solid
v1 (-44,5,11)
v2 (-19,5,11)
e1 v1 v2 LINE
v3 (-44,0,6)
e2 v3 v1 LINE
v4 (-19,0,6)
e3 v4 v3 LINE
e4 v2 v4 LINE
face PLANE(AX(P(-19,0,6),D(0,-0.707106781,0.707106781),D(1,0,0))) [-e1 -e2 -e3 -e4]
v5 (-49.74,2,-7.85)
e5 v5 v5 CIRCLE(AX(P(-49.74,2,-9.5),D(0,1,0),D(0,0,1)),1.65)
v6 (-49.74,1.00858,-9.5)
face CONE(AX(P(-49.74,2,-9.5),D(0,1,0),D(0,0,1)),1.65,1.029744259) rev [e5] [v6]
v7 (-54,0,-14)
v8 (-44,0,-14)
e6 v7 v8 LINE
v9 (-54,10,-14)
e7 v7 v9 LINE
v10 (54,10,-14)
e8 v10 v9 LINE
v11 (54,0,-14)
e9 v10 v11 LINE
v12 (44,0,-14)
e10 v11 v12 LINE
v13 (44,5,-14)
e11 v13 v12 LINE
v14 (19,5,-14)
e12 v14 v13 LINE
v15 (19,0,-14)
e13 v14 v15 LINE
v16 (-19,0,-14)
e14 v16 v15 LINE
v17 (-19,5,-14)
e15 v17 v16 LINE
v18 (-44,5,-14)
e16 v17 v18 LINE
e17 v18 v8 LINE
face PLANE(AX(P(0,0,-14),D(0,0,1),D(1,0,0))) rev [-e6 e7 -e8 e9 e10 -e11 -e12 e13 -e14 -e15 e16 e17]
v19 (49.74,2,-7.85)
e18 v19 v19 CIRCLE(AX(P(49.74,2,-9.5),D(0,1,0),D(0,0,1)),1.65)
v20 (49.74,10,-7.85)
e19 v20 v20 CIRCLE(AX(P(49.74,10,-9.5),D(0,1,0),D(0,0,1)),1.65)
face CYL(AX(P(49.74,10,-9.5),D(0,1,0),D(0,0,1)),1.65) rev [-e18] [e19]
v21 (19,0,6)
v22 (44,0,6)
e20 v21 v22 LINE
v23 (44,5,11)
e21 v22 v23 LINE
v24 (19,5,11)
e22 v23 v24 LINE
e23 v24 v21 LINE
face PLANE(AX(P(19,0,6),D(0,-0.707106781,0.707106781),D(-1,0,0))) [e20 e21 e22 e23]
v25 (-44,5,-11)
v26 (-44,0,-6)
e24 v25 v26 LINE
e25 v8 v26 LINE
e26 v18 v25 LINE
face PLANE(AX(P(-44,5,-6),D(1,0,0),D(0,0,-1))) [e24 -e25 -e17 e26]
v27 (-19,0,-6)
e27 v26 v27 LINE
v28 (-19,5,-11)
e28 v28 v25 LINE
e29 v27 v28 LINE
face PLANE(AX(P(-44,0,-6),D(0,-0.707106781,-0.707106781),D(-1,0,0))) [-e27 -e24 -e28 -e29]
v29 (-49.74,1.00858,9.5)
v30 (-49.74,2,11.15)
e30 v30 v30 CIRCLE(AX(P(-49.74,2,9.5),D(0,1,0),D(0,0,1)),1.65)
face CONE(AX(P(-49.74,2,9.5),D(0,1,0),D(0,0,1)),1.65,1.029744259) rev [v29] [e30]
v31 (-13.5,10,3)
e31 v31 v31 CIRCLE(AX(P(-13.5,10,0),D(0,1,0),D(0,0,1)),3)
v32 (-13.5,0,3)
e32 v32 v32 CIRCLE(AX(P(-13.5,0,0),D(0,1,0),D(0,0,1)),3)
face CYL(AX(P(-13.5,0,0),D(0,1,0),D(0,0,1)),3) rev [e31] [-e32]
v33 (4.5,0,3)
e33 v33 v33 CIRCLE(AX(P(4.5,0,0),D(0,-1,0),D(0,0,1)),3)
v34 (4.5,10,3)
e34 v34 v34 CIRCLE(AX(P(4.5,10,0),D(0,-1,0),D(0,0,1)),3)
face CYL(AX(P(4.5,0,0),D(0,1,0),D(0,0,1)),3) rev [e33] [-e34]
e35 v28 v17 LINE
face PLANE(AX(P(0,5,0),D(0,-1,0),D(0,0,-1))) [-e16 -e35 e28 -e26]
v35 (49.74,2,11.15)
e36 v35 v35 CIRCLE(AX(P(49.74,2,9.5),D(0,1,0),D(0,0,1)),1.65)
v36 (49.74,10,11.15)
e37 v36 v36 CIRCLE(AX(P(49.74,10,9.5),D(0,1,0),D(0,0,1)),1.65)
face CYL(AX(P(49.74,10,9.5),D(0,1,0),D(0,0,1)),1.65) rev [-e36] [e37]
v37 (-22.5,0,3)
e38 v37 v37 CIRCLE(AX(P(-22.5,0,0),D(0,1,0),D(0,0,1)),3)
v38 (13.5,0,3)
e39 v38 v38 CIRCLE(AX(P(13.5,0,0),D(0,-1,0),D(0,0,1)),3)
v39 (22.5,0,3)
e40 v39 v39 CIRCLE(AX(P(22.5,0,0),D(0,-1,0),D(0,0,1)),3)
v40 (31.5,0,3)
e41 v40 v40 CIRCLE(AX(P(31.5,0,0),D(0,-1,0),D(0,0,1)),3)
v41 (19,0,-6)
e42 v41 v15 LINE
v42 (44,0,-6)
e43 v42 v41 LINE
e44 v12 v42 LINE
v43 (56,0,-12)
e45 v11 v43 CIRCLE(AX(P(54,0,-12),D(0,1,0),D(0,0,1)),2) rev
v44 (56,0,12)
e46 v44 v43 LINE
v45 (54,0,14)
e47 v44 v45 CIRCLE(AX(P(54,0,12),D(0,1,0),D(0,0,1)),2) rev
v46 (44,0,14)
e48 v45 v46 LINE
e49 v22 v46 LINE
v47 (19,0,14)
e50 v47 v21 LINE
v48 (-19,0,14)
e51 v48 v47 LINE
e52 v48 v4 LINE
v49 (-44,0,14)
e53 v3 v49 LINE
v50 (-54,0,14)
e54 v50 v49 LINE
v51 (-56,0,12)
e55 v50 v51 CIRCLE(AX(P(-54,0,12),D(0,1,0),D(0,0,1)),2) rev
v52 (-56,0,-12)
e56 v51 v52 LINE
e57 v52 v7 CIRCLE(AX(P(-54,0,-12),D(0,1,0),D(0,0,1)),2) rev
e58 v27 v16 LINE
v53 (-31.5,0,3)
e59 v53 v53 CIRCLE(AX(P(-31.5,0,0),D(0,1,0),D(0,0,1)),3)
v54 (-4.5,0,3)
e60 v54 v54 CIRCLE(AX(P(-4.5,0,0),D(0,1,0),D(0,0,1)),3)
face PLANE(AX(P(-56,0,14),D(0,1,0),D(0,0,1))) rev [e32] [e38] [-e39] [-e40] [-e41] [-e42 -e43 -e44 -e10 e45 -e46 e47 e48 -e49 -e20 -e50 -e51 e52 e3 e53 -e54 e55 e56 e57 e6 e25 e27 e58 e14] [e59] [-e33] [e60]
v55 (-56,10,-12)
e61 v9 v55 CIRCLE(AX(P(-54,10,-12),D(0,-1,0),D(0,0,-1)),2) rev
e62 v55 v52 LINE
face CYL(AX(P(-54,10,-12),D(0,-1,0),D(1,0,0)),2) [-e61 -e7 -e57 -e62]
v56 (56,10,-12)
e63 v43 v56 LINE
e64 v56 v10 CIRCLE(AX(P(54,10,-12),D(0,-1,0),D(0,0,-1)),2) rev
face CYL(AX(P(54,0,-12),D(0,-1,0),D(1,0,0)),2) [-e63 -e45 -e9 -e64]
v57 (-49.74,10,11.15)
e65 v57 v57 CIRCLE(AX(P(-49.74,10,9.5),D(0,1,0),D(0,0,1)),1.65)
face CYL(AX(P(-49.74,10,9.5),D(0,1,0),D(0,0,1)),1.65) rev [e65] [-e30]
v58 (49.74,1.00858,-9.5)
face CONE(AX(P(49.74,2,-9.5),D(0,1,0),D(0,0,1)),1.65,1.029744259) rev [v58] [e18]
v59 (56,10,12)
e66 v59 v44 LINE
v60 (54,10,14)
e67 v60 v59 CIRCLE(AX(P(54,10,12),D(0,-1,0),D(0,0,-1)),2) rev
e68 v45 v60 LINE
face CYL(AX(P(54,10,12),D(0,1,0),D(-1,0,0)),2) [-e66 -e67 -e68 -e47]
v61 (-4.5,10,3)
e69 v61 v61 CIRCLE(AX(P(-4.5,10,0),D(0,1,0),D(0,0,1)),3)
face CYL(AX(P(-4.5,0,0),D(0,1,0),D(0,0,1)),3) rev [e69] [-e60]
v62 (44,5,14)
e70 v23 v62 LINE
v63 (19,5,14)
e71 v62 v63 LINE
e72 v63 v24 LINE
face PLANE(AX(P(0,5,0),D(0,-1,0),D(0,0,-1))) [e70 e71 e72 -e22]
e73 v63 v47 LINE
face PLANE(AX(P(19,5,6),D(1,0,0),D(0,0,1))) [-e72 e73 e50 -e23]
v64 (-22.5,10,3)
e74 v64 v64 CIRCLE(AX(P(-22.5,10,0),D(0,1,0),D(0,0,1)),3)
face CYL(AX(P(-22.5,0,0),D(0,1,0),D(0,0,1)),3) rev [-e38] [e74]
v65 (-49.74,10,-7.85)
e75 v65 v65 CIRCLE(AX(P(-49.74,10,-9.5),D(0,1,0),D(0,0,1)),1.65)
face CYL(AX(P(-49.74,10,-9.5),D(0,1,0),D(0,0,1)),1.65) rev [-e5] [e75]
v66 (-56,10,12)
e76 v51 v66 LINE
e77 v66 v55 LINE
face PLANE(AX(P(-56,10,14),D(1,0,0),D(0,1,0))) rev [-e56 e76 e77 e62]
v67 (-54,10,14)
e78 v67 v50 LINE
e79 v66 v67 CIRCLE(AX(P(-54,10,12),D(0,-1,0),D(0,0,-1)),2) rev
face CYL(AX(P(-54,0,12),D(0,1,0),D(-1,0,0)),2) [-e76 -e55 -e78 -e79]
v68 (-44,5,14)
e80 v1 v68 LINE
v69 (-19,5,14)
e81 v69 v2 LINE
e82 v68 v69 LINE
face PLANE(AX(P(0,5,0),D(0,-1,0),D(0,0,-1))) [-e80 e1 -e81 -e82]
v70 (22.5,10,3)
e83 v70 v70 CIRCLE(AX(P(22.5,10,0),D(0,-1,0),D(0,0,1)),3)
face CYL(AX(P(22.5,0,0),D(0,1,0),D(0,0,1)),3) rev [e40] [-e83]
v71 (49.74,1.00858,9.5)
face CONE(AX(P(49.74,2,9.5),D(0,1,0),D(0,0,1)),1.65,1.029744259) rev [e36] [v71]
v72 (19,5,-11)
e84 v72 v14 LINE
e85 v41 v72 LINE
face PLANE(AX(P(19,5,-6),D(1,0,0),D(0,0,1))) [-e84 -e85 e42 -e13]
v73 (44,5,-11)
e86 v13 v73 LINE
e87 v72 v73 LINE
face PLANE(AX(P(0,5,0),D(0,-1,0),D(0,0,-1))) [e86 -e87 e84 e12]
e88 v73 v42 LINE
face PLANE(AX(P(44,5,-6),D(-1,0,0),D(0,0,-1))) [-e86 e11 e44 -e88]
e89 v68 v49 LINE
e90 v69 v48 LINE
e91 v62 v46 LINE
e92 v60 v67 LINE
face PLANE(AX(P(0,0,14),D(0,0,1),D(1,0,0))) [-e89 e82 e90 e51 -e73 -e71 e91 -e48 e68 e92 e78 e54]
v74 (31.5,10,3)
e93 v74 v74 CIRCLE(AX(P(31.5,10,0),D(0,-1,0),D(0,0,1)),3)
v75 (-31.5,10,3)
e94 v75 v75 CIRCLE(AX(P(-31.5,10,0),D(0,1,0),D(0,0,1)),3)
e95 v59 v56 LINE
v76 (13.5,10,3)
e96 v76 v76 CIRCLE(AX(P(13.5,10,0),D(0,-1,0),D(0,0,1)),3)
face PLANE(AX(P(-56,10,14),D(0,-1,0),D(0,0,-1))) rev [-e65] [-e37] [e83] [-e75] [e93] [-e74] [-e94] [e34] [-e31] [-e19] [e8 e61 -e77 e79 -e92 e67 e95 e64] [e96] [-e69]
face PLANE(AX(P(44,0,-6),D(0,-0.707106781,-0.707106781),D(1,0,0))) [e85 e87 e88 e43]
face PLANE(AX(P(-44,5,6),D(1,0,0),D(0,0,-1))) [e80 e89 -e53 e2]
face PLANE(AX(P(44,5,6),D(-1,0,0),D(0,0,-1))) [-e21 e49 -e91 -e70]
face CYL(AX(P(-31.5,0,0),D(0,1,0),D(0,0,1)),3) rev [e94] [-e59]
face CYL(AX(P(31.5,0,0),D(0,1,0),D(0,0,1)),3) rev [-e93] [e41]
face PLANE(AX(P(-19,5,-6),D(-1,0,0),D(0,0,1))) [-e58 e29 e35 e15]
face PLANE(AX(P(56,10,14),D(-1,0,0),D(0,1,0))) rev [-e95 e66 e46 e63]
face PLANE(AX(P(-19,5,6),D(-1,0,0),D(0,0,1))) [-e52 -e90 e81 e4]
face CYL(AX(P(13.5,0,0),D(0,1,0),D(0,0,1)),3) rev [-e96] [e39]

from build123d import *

# Parameters (mm, degrees)
SKETCH1_W                 = 56
SKETCH1_H                 = 10
BOSS_EXTRUDE1_DEPTH       = 14
SKETCH9_W                 = 25
SKETCH9_H                 = 8
CUT_EXTRUDE2_DEPTH        = 5
CHAMFER2_SIZE             = 5
SKETCH10_R                = 3
CUT_EXTRUDE3_DEPTH        = 59.583274064
F_3_0MM_DOWEL_HOLE1_D     = 3.3
F_3_0MM_DOWEL_HOLE1_DEPTH = 8
F_3_0MM_DOWEL_HOLE1_TIP   = 0.991420021
FILLET1_R                 = 2


with BuildPart() as part:
    # Sketch1 → Boss-Extrude1 (new, symmetric)
    with BuildSketch(Plane.XY):
        with Locations((-28, 5)):
            Rectangle(SKETCH1_W, SKETCH1_H)
    extrude(amount=BOSS_EXTRUDE1_DEPTH, both=True)

    # Sketch9 → Cut-Extrude2 (cut)
    with BuildSketch(Plane(origin=(0, 0, 0), x_dir=(1, 0, 0), z_dir=(0, 1, 0))):
        with Locations((-31.5, 10)):
            Rectangle(SKETCH9_W, SKETCH9_H)
        with Locations((-31.5, -10)):
            Rectangle(SKETCH9_W, SKETCH9_H)
    extrude(amount=CUT_EXTRUDE2_DEPTH, mode=Mode.SUBTRACT)

    # Chamfer2
    chamfer2_edges = [part.edges().sort_by_distance(p)[0] for p in [
        (-31.5, 5, -6),
        (-31.5, 5, 6),
    ]]
    chamfer(chamfer2_edges, length=CHAMFER2_SIZE - 0.0001)  # a hair under: the kernel refuses the full size

    # Sketch10 → Cut-Extrude3 (cut, through all)
    with BuildSketch(Plane(origin=(0, 10, 0), x_dir=(1, 0, 0), z_dir=(0, 1, 0))):
        with Locations(Location((-4.5, 0, 0), (0, 0, 270))):
            Circle(SKETCH10_R)
        with Locations(Location((-13.5, 0, 0), (0, 0, 270))):
            Circle(SKETCH10_R)
        with Locations(Location((-22.5, 0, 0), (0, 0, 270))):
            Circle(SKETCH10_R)
        with Locations(Location((-31.5, 0, 0), (0, 0, 270))):
            Circle(SKETCH10_R)
    extrude(amount=-CUT_EXTRUDE3_DEPTH, mode=Mode.SUBTRACT)

    # Mirror1: part across plane


with BuildPart() as part_1:
    add(part.part)
    add(part.part.mirror(Plane(origin=(0, 10, 14), x_dir=(0, 0, 1), z_dir=(-1, 0, 0))))

    # Ø3.0mm Dowel Hole1
    with Locations(Plane(origin=(0, 10, 0), x_dir=(1, 0, 0), z_dir=(0, 1, 0))):
        with Locations((49.74, 9.5), (-49.74, -9.5), (-49.74, 9.5), (49.74, -9.5)):
            Hole(F_3_0MM_DOWEL_HOLE1_D / 2, depth=F_3_0MM_DOWEL_HOLE1_DEPTH)
            with Locations((0, 0, -(F_3_0MM_DOWEL_HOLE1_DEPTH + F_3_0MM_DOWEL_HOLE1_TIP / 2))):  # 118° drill point
                Cone(0, F_3_0MM_DOWEL_HOLE1_D / 2, F_3_0MM_DOWEL_HOLE1_TIP, mode=Mode.SUBTRACT)

    # Fillet1
    fillet1_edges = [part_1.edges().sort_by_distance(p)[0] for p in [
        (-56, 5, 14),
        (-56, 5, -14),
        (56, 5, -14),
        (56, 5, 14),
    ]]
    fillet(fillet1_edges, radius=FILLET1_R)


solid = part_1.part
